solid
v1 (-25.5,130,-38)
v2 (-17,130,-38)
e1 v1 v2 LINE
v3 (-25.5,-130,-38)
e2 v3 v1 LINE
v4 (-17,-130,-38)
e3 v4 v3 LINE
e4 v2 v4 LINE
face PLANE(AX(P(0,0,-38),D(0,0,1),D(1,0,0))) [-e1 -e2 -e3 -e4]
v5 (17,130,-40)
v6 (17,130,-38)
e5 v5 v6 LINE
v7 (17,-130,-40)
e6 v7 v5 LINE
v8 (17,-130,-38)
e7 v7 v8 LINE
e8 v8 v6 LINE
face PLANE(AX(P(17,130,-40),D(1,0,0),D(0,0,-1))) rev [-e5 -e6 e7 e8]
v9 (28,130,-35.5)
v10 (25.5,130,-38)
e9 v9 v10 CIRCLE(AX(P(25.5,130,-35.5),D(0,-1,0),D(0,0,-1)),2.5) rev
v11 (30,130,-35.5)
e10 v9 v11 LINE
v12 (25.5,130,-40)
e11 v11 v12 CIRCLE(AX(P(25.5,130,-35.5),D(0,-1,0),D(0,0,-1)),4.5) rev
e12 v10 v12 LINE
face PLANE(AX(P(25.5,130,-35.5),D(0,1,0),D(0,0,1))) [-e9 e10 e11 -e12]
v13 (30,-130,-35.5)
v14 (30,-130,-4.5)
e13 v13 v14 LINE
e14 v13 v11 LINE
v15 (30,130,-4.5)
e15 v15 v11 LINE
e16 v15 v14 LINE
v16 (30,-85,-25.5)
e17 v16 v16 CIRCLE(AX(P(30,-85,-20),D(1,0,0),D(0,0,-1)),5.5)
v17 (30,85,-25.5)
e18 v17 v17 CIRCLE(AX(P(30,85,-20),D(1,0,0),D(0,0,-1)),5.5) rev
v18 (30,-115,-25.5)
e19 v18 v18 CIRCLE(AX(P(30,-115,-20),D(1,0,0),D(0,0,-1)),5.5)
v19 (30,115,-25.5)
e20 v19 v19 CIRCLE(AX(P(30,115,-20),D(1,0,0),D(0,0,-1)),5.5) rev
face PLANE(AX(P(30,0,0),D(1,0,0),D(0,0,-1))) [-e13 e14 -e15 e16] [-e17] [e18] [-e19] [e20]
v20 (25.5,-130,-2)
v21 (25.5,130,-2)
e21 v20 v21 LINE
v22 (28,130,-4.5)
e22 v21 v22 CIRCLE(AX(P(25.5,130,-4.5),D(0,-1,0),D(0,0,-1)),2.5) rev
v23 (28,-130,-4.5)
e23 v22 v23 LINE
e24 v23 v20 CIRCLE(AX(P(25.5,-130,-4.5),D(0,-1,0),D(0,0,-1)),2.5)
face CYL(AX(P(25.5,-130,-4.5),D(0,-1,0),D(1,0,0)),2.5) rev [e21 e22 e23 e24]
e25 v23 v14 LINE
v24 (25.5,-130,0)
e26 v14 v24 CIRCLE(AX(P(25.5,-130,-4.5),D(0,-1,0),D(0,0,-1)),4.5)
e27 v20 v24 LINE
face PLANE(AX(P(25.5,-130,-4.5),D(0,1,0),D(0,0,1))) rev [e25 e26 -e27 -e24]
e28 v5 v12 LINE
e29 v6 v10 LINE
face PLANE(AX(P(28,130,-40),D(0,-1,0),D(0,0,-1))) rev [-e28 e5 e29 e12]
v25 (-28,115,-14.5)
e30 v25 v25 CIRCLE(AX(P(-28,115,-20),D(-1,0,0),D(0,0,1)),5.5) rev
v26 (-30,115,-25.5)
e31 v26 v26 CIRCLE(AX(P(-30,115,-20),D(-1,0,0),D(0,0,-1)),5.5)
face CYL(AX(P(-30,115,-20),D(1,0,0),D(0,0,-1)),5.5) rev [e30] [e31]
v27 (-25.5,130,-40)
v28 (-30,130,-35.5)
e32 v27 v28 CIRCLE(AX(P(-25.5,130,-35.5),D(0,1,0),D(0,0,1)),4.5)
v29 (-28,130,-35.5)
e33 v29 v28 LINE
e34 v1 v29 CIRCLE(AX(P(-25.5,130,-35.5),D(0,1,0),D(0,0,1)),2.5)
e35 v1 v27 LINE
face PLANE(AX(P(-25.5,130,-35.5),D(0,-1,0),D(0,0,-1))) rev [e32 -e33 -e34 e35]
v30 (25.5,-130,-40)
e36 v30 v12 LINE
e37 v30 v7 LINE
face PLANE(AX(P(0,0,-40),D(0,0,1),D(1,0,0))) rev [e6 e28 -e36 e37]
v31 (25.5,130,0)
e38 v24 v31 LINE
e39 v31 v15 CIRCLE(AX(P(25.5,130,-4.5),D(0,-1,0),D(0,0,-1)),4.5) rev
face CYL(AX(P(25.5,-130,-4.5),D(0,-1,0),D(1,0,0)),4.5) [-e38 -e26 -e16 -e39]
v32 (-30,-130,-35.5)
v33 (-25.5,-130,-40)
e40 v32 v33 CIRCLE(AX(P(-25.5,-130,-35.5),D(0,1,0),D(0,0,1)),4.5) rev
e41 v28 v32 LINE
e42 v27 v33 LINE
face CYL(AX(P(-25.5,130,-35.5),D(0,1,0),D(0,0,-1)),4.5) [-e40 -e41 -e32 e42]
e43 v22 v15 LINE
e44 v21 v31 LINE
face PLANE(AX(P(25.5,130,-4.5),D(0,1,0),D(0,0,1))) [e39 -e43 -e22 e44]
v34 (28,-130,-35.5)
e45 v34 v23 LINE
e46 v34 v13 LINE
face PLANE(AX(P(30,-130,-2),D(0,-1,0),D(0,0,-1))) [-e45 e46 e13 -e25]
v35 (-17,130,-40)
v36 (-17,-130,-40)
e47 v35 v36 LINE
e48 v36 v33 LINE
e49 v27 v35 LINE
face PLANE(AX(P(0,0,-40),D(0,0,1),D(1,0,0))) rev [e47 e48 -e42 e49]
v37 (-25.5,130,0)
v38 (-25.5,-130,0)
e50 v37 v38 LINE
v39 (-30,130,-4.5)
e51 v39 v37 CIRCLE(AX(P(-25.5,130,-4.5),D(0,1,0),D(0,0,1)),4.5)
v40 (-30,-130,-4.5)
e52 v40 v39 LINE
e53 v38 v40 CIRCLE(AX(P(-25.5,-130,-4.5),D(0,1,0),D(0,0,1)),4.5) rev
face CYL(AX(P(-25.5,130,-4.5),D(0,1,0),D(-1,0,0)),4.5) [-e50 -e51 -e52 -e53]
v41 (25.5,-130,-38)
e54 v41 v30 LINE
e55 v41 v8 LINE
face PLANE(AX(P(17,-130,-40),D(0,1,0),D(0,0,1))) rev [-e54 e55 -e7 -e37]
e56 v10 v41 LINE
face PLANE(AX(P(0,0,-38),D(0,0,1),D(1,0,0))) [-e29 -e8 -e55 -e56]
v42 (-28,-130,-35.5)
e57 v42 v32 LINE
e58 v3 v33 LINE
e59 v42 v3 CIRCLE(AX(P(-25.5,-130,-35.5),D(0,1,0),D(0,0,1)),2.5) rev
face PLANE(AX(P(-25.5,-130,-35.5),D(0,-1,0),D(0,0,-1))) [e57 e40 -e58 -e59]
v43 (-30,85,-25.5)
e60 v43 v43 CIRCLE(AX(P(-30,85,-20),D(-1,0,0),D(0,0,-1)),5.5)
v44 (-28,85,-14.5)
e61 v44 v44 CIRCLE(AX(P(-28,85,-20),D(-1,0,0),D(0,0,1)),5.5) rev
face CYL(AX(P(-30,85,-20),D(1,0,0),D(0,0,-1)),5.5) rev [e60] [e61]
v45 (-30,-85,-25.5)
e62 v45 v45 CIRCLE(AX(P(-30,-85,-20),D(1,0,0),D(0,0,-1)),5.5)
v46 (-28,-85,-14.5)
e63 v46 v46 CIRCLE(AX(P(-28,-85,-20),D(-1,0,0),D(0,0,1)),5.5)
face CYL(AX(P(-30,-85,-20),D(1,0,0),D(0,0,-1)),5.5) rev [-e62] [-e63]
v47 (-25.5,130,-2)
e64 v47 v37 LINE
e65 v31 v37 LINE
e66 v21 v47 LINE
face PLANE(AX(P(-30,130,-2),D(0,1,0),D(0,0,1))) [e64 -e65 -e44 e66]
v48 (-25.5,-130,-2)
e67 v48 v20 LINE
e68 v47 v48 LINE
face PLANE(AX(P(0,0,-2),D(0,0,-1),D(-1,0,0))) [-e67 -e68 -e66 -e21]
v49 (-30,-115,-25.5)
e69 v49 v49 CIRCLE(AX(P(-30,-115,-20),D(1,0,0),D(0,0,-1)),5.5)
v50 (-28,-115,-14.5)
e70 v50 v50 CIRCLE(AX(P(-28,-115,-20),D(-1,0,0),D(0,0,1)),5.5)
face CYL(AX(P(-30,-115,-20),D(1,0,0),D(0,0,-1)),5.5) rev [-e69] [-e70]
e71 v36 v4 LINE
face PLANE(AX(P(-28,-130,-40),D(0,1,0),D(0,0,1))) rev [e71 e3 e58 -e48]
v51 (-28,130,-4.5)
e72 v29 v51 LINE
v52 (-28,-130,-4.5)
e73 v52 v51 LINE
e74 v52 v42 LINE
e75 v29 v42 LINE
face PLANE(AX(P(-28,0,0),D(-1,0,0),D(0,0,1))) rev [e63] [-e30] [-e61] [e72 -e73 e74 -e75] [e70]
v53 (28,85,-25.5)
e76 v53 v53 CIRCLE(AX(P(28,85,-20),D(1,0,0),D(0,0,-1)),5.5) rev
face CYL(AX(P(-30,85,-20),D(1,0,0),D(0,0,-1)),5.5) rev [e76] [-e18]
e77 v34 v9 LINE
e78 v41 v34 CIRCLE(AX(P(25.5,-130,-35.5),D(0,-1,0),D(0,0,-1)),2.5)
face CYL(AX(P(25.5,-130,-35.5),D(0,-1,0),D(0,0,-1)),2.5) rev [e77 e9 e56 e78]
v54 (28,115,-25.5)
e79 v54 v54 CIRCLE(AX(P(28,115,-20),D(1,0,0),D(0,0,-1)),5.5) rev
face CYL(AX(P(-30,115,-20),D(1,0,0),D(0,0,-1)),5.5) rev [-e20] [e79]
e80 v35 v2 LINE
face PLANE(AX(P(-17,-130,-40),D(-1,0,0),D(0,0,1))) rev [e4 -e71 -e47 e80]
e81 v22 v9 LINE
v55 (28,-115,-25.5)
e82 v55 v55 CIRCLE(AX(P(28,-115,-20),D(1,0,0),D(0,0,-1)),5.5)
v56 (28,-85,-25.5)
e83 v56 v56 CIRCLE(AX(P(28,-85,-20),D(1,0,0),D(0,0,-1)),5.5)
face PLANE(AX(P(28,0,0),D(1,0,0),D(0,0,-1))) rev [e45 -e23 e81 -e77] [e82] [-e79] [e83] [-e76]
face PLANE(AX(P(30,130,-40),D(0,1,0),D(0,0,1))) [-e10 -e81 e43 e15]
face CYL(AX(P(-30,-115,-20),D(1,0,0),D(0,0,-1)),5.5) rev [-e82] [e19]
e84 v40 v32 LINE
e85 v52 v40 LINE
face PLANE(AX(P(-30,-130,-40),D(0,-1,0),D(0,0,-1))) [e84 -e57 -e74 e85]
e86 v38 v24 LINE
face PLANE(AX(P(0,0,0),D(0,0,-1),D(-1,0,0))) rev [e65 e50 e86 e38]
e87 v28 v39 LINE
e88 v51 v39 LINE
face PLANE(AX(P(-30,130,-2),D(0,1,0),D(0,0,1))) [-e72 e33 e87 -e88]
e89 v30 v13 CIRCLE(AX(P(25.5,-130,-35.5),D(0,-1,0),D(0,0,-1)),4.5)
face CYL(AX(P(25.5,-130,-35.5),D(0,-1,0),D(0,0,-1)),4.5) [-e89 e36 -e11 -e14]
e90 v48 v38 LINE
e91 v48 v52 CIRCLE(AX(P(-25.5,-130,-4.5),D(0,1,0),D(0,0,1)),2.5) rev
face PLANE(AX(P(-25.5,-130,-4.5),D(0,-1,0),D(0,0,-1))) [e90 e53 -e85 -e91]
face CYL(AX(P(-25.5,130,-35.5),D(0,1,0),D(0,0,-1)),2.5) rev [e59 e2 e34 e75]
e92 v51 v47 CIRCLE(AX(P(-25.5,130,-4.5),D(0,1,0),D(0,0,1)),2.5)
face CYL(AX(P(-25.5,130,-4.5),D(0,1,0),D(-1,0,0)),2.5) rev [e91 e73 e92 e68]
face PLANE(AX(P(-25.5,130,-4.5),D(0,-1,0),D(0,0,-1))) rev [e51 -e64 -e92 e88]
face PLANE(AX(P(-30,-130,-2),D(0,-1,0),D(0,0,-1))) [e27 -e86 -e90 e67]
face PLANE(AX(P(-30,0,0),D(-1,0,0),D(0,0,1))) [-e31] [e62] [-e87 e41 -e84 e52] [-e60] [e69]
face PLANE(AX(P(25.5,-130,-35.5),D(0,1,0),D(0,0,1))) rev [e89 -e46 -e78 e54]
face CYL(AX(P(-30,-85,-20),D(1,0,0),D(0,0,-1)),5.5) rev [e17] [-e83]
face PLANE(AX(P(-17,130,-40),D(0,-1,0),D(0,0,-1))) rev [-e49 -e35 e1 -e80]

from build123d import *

# Parameters (mm, degrees)
SKETCH1_W                      = 60
SKETCH1_H                      = 260
BASE_FLANGE1_DEPTH             = 2
EDGE_FLANGE1_STRIP_W           = 13
EDGE_FLANGE1_STRIP_H           = 2
EDGE_FLANGE1_STRIP_CUT_DEPTH   = 260
EDGE_FLANGE1_STRIP_2_W         = 13
EDGE_FLANGE1_STRIP_2_H         = 2
EDGE_FLANGE1_STRIP_CUT_2_DEPTH = 260
EDGE_FLANGE1_DEPTH             = 260
EDGE_FLANGE1_BEND_DEPTH        = 260
EDGE_FLANGE2_STRIP_W           = 13
EDGE_FLANGE2_STRIP_H           = 2
EDGE_FLANGE2_STRIP_CUT_DEPTH   = 260
EDGE_FLANGE2_STRIP_2_W         = 13
EDGE_FLANGE2_STRIP_2_H         = 2
EDGE_FLANGE2_STRIP_CUT_2_DEPTH = 260
EDGE_FLANGE2_DEPTH             = 260
EDGE_FLANGE2_BEND_DEPTH        = 260
SKETCH18_R                     = 5.5
CUT_EXTRUDE1_DEPTH             = 149.660687473


# Sheet-metal steps are written as plain solids
with BuildPart() as part:
    # Sketch1 → Base-Flange1 (new body)
    with BuildSketch(Plane.XY):
        Rectangle(SKETCH1_W, SKETCH1_H)
    extrude(amount=-BASE_FLANGE1_DEPTH)

    # Edge-Flange1 strip (across the edge) → Edge-Flange1 strip cut (cut)
    with BuildSketch(Plane(origin=(30, 130, -2), x_dir=(-1, 0, 0), z_dir=(0, -1, 0))):
        with Locations((-2, -1)):
            Rectangle(EDGE_FLANGE1_STRIP_W, EDGE_FLANGE1_STRIP_H)
    extrude(amount=EDGE_FLANGE1_STRIP_CUT_DEPTH, mode=Mode.SUBTRACT)

    # Edge-Flange1 strip 2 (across the edge) → Edge-Flange1 strip cut 2 (cut)
    with BuildSketch(Plane(origin=(-30, -130, -2), x_dir=(1, 0, 0), z_dir=(0, 1, 0))):
        with Locations((-2, -1)):
            Rectangle(EDGE_FLANGE1_STRIP_2_W, EDGE_FLANGE1_STRIP_2_H)
    extrude(amount=EDGE_FLANGE1_STRIP_CUT_2_DEPTH, mode=Mode.SUBTRACT)

    # Edge-Flange1 section (across the edge) → Edge-Flange1 (add)
    with BuildSketch(Plane(origin=(30, 130, -2), x_dir=(-1, 0, 0), z_dir=(0, -1, 0))):
        with BuildLine():
            Line((0, 2.5), (0, 38))
            Line((0, 38), (2, 38))
            Line((2, 38), (2, 2.5))
            ThreePointArc((2, 2.5), (2.732233047, 0.732233047), (4.5, 0))
            Line((4.5, 0), (4.5, -2))
            ThreePointArc((4.5, -2), (1.318019485, -0.681980515), (0, 2.5))
        make_face()
    extrude(amount=EDGE_FLANGE1_DEPTH)

    # Edge-Flange1 section 2 (across the edge) → Edge-Flange1 bend (add)
    with BuildSketch(Plane(origin=(-30, -130, -2), x_dir=(1, 0, 0), z_dir=(0, 1, 0))):
        with BuildLine():
            Line((0, 2.5), (0, 38))
            Line((0, 38), (2, 38))
            Line((2, 38), (2, 2.5))
            ThreePointArc((2, 2.5), (2.732233047, 0.732233047), (4.5, 0))
            Line((4.5, 0), (4.5, -2))
            ThreePointArc((4.5, -2), (1.318019485, -0.681980515), (0, 2.5))
        make_face()
    extrude(amount=EDGE_FLANGE1_BEND_DEPTH)

    # Edge-Flange2 strip (across the edge) → Edge-Flange2 strip cut (cut)
    with BuildSketch(Plane(origin=(28, 130, -40), x_dir=(0, 0, 1), z_dir=(0, -1, 0))):
        with Locations((-2, -1)):
            Rectangle(EDGE_FLANGE2_STRIP_W, EDGE_FLANGE2_STRIP_H)
    extrude(amount=EDGE_FLANGE2_STRIP_CUT_DEPTH, mode=Mode.SUBTRACT)

    # Edge-Flange2 strip 2 (across the edge) → Edge-Flange2 strip cut 2 (cut)
    with BuildSketch(Plane(origin=(-28, -130, -40), x_dir=(0, 0, 1), z_dir=(0, 1, 0))):
        with Locations((-2, -1)):
            Rectangle(EDGE_FLANGE2_STRIP_2_W, EDGE_FLANGE2_STRIP_2_H)
    extrude(amount=EDGE_FLANGE2_STRIP_CUT_2_DEPTH, mode=Mode.SUBTRACT)

    # Edge-Flange2 section (across the edge) → Edge-Flange2 (add)
    with BuildSketch(Plane(origin=(28, 130, -40), x_dir=(0, 0, 1), z_dir=(0, -1, 0))):
        with BuildLine():
            Line((0, 2.5), (0, 11))
            Line((0, 11), (2, 11))
            Line((2, 11), (2, 2.5))
            ThreePointArc((2, 2.5), (2.732233047, 0.732233047), (4.5, 0))
            Line((4.5, 0), (4.5, -2))
            ThreePointArc((4.5, -2), (1.318019485, -0.681980515), (0, 2.5))
        make_face()
    extrude(amount=EDGE_FLANGE2_DEPTH)

    # Edge-Flange2 section 2 (across the edge) → Edge-Flange2 bend (add)
    with BuildSketch(Plane(origin=(-28, -130, -40), x_dir=(0, 0, 1), z_dir=(0, 1, 0))):
        with BuildLine():
            Line((0, 2.5), (0, 11))
            Line((0, 11), (2, 11))
            Line((2, 11), (2, 2.5))
            ThreePointArc((2, 2.5), (2.732233047, 0.732233047), (4.5, 0))
            Line((4.5, 0), (4.5, -2))
            ThreePointArc((4.5, -2), (1.318019485, -0.681980515), (0, 2.5))
        make_face()
    extrude(amount=EDGE_FLANGE2_BEND_DEPTH)

    # Sketch18 → Cut-Extrude1 (cut, symmetric)
    with BuildSketch(Plane(origin=(30, 0, 0), x_dir=(0, 0, -1), z_dir=(1, 0, 0))):
        with Locations((20, -115)):
            Circle(SKETCH18_R)
        with Locations((20, -85)):
            Circle(SKETCH18_R)
    cut_extrude1 = extrude(amount=CUT_EXTRUDE1_DEPTH, both=True, mode=Mode.SUBTRACT)

    # Mirror1: Cut-Extrude1 across plane
    add(cut_extrude1.mirror(Plane.ZX), mode=Mode.SUBTRACT)


solid = part.part
